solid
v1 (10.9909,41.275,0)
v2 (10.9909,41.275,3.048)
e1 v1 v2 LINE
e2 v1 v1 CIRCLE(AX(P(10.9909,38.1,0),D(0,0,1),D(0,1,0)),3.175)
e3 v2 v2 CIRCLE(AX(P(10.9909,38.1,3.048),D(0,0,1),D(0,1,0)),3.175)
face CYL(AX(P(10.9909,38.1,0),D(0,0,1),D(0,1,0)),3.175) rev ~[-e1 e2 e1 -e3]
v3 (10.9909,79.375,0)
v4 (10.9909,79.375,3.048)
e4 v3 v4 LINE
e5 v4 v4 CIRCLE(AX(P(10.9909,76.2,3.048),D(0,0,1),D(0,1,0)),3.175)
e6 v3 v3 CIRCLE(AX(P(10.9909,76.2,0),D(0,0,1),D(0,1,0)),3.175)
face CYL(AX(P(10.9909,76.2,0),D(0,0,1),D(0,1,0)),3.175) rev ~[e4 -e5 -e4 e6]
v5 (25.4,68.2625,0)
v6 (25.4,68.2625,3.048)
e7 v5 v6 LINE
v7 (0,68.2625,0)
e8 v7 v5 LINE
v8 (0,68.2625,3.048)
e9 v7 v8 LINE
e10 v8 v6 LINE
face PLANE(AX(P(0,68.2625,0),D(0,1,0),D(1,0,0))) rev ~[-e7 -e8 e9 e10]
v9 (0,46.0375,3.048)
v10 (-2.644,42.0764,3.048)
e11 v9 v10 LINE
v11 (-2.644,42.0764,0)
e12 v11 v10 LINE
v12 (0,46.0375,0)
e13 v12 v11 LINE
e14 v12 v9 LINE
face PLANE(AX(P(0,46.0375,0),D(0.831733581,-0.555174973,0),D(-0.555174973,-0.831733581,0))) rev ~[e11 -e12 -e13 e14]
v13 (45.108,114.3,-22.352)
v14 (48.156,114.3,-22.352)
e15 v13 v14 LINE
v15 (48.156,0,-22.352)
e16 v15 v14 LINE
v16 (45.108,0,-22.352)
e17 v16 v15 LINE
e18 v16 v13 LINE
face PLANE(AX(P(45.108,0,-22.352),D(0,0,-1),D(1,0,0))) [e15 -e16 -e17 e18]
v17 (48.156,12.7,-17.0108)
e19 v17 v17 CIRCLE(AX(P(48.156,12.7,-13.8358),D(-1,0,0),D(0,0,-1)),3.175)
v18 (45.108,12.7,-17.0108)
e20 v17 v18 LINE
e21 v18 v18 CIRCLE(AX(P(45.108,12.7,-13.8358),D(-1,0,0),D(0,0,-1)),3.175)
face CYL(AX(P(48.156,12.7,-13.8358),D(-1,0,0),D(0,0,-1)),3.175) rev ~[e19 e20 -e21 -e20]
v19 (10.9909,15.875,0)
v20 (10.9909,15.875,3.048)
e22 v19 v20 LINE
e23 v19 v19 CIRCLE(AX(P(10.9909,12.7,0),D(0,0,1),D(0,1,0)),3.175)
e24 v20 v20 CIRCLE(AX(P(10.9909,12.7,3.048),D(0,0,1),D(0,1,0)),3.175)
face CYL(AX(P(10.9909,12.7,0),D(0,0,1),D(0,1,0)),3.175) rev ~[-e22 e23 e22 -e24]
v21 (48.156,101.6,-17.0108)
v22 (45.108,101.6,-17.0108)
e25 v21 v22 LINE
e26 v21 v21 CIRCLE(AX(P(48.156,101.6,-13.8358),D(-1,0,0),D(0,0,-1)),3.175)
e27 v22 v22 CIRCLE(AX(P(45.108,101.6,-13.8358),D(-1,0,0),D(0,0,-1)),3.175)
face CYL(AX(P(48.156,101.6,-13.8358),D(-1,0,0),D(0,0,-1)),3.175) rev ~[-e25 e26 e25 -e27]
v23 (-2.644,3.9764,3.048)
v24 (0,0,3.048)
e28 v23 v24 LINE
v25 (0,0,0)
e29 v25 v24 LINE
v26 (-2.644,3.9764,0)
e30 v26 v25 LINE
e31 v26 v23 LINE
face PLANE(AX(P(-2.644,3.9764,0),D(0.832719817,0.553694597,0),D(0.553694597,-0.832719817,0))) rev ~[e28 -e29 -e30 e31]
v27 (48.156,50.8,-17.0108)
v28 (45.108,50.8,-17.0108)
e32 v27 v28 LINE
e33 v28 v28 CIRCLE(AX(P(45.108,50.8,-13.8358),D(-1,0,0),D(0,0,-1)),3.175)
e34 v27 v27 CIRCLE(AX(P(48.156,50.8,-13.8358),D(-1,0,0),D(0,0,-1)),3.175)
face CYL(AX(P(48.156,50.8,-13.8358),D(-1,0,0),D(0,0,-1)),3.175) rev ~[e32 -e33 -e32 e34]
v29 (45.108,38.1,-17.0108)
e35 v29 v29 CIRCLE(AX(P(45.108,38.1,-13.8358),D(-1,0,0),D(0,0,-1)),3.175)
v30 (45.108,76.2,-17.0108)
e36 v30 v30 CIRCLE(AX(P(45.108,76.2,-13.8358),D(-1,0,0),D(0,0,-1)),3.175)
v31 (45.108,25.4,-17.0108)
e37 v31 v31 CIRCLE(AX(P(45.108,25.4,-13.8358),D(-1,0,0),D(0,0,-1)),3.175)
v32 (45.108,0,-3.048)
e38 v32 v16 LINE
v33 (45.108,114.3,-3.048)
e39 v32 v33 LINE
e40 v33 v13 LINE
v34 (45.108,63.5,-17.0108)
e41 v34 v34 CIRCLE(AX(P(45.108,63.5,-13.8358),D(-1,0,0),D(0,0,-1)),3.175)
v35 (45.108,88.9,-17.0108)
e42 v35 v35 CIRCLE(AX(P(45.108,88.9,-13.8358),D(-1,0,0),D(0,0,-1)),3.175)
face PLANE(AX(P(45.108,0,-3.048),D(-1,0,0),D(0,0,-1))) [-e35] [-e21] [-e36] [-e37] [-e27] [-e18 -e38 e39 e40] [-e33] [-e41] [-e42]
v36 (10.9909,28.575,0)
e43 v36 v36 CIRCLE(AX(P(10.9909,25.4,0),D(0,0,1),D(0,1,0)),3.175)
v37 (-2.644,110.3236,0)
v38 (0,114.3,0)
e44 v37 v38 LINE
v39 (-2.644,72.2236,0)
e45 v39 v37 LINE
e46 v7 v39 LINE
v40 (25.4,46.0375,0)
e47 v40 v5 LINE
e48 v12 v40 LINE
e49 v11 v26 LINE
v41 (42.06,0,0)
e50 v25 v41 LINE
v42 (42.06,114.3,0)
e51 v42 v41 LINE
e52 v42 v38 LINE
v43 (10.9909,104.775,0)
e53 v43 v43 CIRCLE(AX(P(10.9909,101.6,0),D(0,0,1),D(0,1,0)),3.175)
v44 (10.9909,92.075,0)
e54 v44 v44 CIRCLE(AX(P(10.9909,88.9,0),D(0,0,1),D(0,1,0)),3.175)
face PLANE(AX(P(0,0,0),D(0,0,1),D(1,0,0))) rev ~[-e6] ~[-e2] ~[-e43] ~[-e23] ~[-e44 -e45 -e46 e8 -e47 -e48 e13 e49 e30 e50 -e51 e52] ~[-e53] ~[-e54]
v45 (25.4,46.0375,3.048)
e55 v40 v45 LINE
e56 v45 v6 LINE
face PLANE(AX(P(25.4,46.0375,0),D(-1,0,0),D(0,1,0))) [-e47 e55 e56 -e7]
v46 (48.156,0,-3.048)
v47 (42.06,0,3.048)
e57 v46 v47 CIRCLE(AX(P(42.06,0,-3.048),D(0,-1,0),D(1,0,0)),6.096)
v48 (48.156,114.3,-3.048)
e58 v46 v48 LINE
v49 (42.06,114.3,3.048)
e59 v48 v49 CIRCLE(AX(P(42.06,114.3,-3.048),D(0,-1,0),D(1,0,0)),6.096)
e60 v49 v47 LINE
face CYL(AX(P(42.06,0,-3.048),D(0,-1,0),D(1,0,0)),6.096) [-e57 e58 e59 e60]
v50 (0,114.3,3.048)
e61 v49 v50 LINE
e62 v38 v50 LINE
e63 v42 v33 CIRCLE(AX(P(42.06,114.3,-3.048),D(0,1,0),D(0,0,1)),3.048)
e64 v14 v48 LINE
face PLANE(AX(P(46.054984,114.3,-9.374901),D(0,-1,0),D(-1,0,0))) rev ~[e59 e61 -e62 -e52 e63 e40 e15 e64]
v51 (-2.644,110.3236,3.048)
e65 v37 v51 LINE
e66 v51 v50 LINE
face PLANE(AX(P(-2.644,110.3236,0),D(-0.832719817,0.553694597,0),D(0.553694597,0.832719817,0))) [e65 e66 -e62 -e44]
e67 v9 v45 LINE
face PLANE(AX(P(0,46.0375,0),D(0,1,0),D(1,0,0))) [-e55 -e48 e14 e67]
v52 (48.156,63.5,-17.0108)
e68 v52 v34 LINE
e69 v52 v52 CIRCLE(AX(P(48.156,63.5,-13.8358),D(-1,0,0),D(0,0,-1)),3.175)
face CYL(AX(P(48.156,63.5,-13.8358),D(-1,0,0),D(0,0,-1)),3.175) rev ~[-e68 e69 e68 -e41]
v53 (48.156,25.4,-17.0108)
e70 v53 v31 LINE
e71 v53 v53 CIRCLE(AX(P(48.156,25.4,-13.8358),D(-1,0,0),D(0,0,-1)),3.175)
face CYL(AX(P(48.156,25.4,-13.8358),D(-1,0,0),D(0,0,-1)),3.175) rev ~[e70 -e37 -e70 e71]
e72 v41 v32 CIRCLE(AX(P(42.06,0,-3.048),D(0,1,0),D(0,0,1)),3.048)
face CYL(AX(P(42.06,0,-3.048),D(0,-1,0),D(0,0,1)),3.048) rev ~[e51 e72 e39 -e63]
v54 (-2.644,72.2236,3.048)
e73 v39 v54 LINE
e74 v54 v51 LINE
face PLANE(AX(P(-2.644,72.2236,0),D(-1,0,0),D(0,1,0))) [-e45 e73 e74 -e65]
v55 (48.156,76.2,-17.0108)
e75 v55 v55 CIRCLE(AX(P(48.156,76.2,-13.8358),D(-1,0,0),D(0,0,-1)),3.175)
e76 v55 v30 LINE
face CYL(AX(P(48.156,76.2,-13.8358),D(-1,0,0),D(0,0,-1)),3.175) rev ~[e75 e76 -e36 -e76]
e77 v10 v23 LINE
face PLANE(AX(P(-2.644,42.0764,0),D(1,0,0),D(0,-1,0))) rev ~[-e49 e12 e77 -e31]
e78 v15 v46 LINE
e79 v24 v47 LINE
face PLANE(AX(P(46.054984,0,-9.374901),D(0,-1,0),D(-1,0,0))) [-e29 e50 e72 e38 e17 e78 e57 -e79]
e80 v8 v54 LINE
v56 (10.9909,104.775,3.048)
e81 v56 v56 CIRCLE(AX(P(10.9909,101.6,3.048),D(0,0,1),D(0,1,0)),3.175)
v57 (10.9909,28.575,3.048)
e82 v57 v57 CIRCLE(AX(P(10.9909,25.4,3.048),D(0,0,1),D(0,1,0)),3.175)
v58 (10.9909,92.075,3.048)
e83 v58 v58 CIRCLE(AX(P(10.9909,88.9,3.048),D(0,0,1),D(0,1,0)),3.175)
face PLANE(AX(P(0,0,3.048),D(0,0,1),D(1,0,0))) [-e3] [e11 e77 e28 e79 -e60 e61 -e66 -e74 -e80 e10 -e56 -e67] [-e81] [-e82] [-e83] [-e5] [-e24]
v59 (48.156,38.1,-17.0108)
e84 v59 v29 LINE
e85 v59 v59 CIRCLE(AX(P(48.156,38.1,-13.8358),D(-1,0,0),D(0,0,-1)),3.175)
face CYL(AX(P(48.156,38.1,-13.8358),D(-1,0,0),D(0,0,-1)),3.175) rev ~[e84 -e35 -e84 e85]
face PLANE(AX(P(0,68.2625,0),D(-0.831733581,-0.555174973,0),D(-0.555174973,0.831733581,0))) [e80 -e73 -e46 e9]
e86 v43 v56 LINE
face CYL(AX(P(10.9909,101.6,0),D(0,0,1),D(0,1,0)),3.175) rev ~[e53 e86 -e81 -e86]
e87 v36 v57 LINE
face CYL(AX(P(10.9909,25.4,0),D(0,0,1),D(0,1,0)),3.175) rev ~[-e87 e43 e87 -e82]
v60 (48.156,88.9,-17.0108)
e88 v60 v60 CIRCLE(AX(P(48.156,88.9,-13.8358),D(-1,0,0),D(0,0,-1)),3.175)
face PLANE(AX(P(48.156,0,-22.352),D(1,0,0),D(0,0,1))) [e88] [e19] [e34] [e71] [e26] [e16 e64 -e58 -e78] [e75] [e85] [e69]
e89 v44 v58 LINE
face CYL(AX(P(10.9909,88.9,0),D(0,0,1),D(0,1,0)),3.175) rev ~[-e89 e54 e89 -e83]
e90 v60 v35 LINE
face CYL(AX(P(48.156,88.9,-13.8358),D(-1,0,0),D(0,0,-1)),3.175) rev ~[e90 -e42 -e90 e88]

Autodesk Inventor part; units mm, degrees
ref_plane "YZ Plane" through (0, 0, 0) normal (1, 0, 0) x (0, 1, 0)
ref_plane "XZ Plane" through (0, 0, 0) normal (0, 1, 0) x (-1, 0, 0)
ref_plane "XY Plane" through (0, 0, 0) normal (0, 0, 1) x (1, 0, 0)
sketch "Sketch1" plane through (0, 0, 0) normal (0, 0, 1) x (1, 0, 0)
  line L0 (0, 46.0375) -> (-2.644, 42.0764)
  line L1 (-2.644, 42.0764) -> (-2.644, 3.9764)
  line L2 (-2.644, 3.9764) -> (0, 0)
  line L3 (0, 46.0375) -> (25.4, 46.0375)
  line L4 (25.4, 46.0375) -> (25.4, 68.2625)
  line L5 (25.4, 57.15) -> (26.8908, 57.15)
  line L6 (0, 68.2625) -> (-2.644, 72.2236)
  line L7 (-2.644, 72.2236) -> (-2.644, 110.3236)
  line L8 (-2.644, 110.3236) -> (0, 114.3)
  line L9 (0, 68.2625) -> (25.4, 68.2625)
  line L10 (25.4, 68.2625) -> (25.4, 46.0375)
  line L11 (48.156, 114.3) -> (0, 114.3)
  line L12 (48.156, 114.3) -> (48.156, 0)
  line L13 (0, 0) -> (48.156, 0)
  line L14 (218.3648, 132.2525) -> (215.7208, 128.2914)
  line L15 (215.7208, 128.2914) -> (215.7208, 90.1914)
  line L16 (215.7208, 90.1914) -> (218.3648, 86.215)
  line L17 (218.3648, 132.2525) -> (234.2398, 132.2525)
  line L18 (218.3648, 154.4775) -> (215.7208, 158.4387)
  line L19 (215.7208, 158.4387) -> (215.7208, 196.5387)
  line L20 (215.7208, 196.5387) -> (218.3648, 200.515)
  line L21 (218.3648, 154.4775) -> (234.2398, 154.4775)
  line L22 (253.8208, 200.515) -> (218.3648, 200.515)
  line L23 (253.8208, 200.515) -> (253.8208, 86.215)
  line L24 (218.3648, 86.215) -> (253.8208, 86.215)
  line L25 (379.0105, 160.3375) -> (376.3665, 156.3764)
  line L26 (376.3665, 156.3764) -> (376.3665, 118.2764)
  line L27 (376.3665, 118.2764) -> (379.0105, 114.3)
  line L28 (379.0105, 160.3375) -> (398.0605, 160.3375)
  line L29 (398.0605, 160.3375) -> (398.0605, 182.5625)
  line L30 (398.0605, 171.45) -> (393.2013, 171.45)
  line L31 (379.0105, 182.5625) -> (376.3665, 186.5236)
  line L32 (376.3665, 186.5236) -> (376.3665, 224.6236)
  line L33 (376.3665, 224.6236) -> (379.0105, 228.6)
  line L34 (379.0105, 182.5625) -> (398.0605, 182.5625)
  line L35 (398.0605, 182.5625) -> (398.0605, 160.3375)
  line L36 (414.4665, 228.6) -> (379.0105, 228.6)
  line L37 (414.4665, 228.6) -> (414.4665, 114.3)
  line L38 (379.0105, 114.3) -> (414.4665, 114.3)
  line L39 (237.4148, 151.3025) -> (237.4148, 135.4275)
  arc A0 (237.4148, 151.3025) -> (234.2398, 154.4775) centre (234.2398, 151.3025) ccw
  arc A1 (234.2398, 132.2525) -> (237.4148, 135.4275) centre (234.2398, 135.4275) ccw
  line L40 (0, 114.3) -> (48.156, 114.3)
  line L41 (48.156, 114.3) -> (48.156, 0)
  line L42 (48.156, 0) -> (0, 0)
  line L43 (0, 0) -> (-2.644, 3.9764)
  line L44 (-2.644, 3.9764) -> (-2.644, 42.0764)
  line L45 (-2.644, 42.0764) -> (0, 46.0375)
  line L46 (0, 46.0375) -> (25.4, 46.0375)
  line L47 (25.4, 46.0375) -> (25.4, 68.2625)
  line L48 (25.4, 68.2625) -> (0, 68.2625)
  line L49 (0, 68.2625) -> (-2.644, 72.2236)
  line L50 (-2.644, 72.2236) -> (-2.644, 110.3236)
  line L51 (-2.644, 110.3236) -> (0, 114.3)
  dimension "d1" = 46.0375
  dimension "d5" = 38.1
  dimension "d6" = 4.7625
  dimension "d8" = 4.7752
  dimension "d9" = 25.4
  dimension "d12" = 22.225
  dimension "d14" = 114.3
  dimension "d15" = 22.756
  dimension "d16" = 21.2652
  dimension "d26" = 46.0375
  dimension "d27" = 38.1
  dimension "d28" = 4.7625
  dimension "d29" = 4.7752
  dimension "d30" = 19.05
  dimension "d31" = 22.225
  dimension "d32" = 114.3
  dimension "d33" = 16.406
  dimension "d34" = 21.2652
  dimension "d35" = 3.175
extrude "Plate1" add sketch "Sketch1" along normal blind 3.048 contours L3 L4 L9 L6 L7 L8 L11 L12 L13 L2 L1 L0
sketch "Sketch5" plane through (45.108, 0, 3.048) normal (1, 0, 0) x (0, 1, 0)
  line L0 (114.3, 0) -> (0, 0)
  line L1 (0, 0) -> (0, -25.4)
  line L2 (0, -25.4) -> (114.3, -25.4)
  line L3 (114.3, -25.4) -> (114.3, 0)
edge flange "Flange1" height 25.4 angle 90 thickness 3.048 bend radius 3.048 thickness toward (1, 0, 0) relief tear relief width 3.048 relief depth 1.524 edges at (48.156, 57.15, 0) wall of the first edge with corners at (45.108, 114.3, 3.048) (45.108, 0, 3.048) (45.108, 0, -22.352) (45.108, 114.3, -22.352)
bend "Bend2"
corner "Corner1"
sketch "Sketch6" plane through (0, 0, 0) normal (0, 0, -1) x (-1, 0, 0)
  line L0 (0, 114.3) -> (-42.06, 114.3) projected
  line L1 (0, 0) -> (-42.06, 0) projected
  point P0 (-10.9909, 101.6)
  point P1 (-10.9909, 88.9)
  point P2 (-10.9909, 76.2)
  point P3 (-10.9909, 38.1)
  point P4 (-10.9909, 25.4)
  point P5 (-10.9909, 12.7)
  dimension "d91" = 12.7
  dimension "d92" = 12.7
  dimension "d93" = 12.7
  dimension "d94" = 12.7
  dimension "d95" = 12.7
  dimension "d96" = 12.7
hole "Hole3" at (10.9909, 101.6, 0) at (10.9909, 88.9, 0) at (10.9909, 76.2, 0) at (10.9909, 38.1, 0) at (10.9909, 25.4, 0) at (10.9909, 12.7, 0) direction (0, 0, 1) diameter 6.35 depth 3.048 tip angle 118
sketch "Sketch7" plane through (48.156, 0, -22.352) normal (1, 0, 0) x (0, 0, -1)
  line L0 (0, 0) -> (-19.304, 0) projected
  point P0 (-22.352, 0)
  point P1 (-8.5162, 101.6)
  point P2 (-8.5162, 88.9)
  point P3 (-8.5162, 76.2)
  point P4 (-8.5162, 63.5)
  point P5 (-8.5162, 50.8)
  point P6 (-8.5162, 38.1)
  point P7 (-8.5162, 25.4)
  point P8 (-8.5162, 12.7)
  dimension "d104" = 12.7
  dimension "d105" = 12.7
  dimension "d106" = 12.7
  dimension "d107" = 12.7
  dimension "d108" = 12.7
  dimension "d109" = 12.7
  dimension "d110" = 12.7
  dimension "d111" = 12.7
hole "Hole4" at (48.156, 88.9, -13.8358) at (48.156, 101.6, -13.8358) at (48.156, 76.2, -13.8358) at (48.156, 63.5, -13.8358) at (48.156, 50.8, -13.8358) at (48.156, 25.4, -13.8358) at (48.156, 38.1, -13.8358) at (48.156, 12.7, -13.8358) direction (-1, 0, 0) diameter 6.35 depth 3.048 tip angle 118
equation "\"d92\" = d91"
equation "\"d93\" = d91"
equation "\"d94\" = d91"
equation "\"d95\" = d91"
equation "\"d96\" = d91"
equation "\"d102\" = Thickness"
equation "\"d105\" = d104"
equation "\"d106\" = d104"
equation "\"d107\" = d104"
equation "\"d108\" = d104"
equation "\"d109\" = d104"
equation "\"d110\" = d104"
equation "\"d111\" = d104"
equation "\"d117\" = Thickness"
equation "\"d81\" = BendReliefWidth"
equation "\"d82\" = BendReliefDepth"
equation "\"d83\" = MinimumRemnant"
equation "\"d84\" = BendRadius"
equation "\"d87\" = BendRadius"
equation "\"d88\" = CornerReliefSize"
equation "\"d89\" = GapSize"
equation "\"d90\" = JacobiRadiusSize"
equation "\"BendRadius\" = Thickness"
equation "\"BendReliefWidth\" = Thickness"
equation "\"BendReliefDepth\" = 0.5 * Thickness"
equation "\"CornerReliefSize\" = 4 * Thickness"
equation "\"MinimumRemnant\" = 2 * Thickness"
equation "\"TransitionRadius\" = BendRadius"
equation "\"JacobiRadiusSize\" = BendRadius"
equation "\"GapSize\" = Thickness"
equation "\"d36\" = BendRadius"
equation "\"Thickness\" = 3.048"
properties part number "Transmission bracket"
